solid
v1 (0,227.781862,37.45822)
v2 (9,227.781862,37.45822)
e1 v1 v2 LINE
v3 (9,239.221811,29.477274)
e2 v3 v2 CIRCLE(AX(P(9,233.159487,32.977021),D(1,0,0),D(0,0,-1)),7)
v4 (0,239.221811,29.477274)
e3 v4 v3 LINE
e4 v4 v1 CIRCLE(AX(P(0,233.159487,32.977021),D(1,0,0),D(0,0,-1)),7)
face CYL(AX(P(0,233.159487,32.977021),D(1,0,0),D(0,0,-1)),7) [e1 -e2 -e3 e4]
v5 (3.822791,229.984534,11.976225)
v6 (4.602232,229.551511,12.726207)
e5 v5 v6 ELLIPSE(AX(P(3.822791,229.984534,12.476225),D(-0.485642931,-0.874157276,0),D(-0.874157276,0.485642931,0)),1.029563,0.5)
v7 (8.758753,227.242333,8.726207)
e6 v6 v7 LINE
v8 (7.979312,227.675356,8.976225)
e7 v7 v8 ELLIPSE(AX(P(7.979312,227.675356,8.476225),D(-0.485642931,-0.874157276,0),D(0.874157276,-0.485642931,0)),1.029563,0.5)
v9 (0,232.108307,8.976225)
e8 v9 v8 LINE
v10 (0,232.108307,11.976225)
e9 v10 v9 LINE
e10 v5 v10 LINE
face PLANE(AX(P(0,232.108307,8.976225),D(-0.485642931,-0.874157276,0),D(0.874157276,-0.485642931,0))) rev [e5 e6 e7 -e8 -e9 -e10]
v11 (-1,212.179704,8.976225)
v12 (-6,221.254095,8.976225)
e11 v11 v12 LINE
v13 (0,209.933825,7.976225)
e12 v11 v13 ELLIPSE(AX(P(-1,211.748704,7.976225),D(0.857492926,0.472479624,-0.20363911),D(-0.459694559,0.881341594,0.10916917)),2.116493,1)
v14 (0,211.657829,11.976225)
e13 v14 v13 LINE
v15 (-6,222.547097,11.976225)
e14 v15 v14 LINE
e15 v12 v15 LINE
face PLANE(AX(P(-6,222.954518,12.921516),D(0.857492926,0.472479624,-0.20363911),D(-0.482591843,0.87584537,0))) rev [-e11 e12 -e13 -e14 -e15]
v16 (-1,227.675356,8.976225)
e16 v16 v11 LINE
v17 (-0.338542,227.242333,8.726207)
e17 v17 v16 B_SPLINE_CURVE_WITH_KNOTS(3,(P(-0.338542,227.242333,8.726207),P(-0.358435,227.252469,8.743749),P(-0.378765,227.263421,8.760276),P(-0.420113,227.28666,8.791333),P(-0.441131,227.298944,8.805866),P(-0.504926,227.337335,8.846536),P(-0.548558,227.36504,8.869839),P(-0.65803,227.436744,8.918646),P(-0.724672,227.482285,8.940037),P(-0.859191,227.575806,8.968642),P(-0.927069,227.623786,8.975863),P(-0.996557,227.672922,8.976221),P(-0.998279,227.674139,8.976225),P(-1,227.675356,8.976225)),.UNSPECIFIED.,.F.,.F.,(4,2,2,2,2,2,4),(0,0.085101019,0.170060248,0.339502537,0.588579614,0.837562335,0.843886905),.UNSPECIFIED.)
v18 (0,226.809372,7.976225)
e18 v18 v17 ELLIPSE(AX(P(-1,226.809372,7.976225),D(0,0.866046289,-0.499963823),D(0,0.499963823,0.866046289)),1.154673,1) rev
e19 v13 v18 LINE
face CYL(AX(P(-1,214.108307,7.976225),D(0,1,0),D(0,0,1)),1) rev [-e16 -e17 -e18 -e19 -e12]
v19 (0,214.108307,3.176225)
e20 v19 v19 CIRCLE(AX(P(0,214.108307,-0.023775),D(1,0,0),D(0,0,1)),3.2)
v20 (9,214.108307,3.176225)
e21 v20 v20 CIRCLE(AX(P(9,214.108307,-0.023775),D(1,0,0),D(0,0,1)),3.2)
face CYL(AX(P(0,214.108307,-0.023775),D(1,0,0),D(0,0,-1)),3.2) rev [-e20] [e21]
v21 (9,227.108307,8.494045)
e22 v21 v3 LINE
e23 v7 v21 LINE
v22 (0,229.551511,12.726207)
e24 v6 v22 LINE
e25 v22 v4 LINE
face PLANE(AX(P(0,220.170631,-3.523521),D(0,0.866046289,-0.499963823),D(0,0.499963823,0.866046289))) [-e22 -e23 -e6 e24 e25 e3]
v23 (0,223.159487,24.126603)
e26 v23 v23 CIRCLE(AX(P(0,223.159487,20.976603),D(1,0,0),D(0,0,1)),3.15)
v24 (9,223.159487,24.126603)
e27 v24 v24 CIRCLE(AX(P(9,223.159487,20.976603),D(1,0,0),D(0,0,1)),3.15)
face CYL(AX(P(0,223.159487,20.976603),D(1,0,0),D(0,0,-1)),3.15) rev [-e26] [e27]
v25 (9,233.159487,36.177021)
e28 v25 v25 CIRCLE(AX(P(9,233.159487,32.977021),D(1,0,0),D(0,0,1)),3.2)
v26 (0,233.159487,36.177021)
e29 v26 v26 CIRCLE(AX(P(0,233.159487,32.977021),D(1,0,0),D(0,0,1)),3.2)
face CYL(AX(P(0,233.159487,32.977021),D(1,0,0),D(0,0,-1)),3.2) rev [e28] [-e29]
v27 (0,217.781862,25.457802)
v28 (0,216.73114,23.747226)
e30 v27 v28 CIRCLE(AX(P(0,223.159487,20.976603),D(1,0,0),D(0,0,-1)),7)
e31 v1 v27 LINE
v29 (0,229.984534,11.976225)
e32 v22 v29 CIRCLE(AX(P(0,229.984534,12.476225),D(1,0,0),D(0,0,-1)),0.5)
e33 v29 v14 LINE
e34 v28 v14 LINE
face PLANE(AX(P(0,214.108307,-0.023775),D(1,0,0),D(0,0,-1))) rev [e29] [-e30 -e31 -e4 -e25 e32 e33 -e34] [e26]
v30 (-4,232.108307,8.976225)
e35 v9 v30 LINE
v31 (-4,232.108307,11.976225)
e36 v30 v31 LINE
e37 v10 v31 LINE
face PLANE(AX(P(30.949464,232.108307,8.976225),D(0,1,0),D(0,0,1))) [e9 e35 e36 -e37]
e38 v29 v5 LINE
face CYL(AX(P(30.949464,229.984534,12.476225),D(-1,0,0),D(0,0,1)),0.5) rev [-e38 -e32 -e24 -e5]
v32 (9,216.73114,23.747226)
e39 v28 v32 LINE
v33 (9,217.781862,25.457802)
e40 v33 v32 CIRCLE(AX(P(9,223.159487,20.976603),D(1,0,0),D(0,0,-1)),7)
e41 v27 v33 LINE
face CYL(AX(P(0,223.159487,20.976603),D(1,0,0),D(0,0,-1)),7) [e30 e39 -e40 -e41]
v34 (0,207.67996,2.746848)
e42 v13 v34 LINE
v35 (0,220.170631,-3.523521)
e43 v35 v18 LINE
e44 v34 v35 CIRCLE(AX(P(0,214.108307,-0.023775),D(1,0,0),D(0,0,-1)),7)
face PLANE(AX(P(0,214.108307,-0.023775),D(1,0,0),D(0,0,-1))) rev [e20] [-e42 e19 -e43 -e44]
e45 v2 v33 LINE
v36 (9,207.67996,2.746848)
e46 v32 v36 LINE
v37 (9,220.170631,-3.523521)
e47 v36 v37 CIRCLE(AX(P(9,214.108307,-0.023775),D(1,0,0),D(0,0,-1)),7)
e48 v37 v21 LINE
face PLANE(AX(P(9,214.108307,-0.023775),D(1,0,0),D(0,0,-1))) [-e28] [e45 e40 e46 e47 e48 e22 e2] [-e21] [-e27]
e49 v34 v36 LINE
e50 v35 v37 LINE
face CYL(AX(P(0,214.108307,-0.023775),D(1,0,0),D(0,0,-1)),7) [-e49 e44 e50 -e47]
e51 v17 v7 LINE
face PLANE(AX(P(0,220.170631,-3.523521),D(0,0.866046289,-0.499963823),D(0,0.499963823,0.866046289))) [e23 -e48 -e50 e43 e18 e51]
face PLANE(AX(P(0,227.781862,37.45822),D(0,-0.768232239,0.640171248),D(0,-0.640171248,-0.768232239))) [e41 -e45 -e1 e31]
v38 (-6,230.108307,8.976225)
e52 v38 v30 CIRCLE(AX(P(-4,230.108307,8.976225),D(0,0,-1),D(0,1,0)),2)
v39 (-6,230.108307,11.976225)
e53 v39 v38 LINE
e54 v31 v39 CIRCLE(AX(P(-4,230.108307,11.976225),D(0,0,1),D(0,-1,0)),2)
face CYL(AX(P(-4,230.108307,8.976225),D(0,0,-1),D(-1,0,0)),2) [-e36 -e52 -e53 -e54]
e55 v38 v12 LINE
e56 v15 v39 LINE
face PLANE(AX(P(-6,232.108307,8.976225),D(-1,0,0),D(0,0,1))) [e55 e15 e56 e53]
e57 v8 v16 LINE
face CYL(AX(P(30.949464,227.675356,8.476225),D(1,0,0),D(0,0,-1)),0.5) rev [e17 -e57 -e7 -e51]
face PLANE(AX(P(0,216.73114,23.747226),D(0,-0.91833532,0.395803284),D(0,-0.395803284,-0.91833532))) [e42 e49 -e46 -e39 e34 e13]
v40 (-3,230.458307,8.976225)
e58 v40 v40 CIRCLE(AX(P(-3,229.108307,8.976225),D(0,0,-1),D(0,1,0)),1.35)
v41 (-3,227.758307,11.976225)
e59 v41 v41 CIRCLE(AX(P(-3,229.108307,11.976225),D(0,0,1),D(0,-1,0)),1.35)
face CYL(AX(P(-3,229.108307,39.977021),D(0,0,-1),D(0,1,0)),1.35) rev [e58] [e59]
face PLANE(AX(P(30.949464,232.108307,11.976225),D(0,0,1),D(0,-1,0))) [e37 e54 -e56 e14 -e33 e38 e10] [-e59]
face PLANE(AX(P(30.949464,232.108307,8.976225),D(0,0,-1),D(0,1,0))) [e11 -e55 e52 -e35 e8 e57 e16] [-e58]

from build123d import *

# Parameters (mm, degrees)
SKETCH1_R                       = 3.20000000000001
SKETCH1_R_2                     = 3.2000000000000157
SKETCH1_R_3                     = 3.1500000000000266
BOSS_EXTRUDE1_DEPTH             = 9.000000000000002
BOSS_EXTRUDE2_DEPTH             = 6
BOSS_EXTRUDE2_DIRECTION_2_REACH = 245.63
SKETCH3_R                       = 1.3499999999999934
CUT_EXTRUDE1_DEPTH              = 243.3192700509415
CHAMFER1_SIZE                   = 6
CHAMFER1_SIZE_2                 = 10
CHAMFER2_SIZE                   = 5
CHAMFER2_SIZE_2                 = 9
FILLET1_R                       = 2
FILLET2_R                       = 0.5
FILLET3_R                       = 0.5
FILLET4_R                       = 1


with BuildPart() as part:
    # Sketch1 → Boss-Extrude1 (new body)
    with BuildSketch(Plane(origin=(9.000000000000002, 0, 0), x_dir=(0, 0, -1), z_dir=(1, 0, 0))):
        with BuildLine():
            Line((3.5235214674406836, 220.17063085897752), (-29.477274377996263, 239.2218112310119))
            ThreePointArc((-29.477274377996263, 239.2218112310119), (-38.718007493319135, 237.16461837930046), (-37.45821987569468, 227.78186152983258))
            Line((-37.45821987569468, 227.78186152983258), (-25.4578021395881, 217.78186152983255))
            ThreePointArc((-25.4578021395881, 217.78186152983255), (-24.640376533153265, 217.19486094146168), (-23.74722639538112, 216.731139964795))
            Line((-23.74722639538112, 216.731139964795), (-2.7468482860507106, 207.6799595927607))
            ThreePointArc((-2.7468482860507106, 207.6799595927607), (6.279741658038257, 210.96778498862912), (3.5235214674406836, 220.17063085897752))
        make_face()
        with Locations(Location((0.02377470320349104, 214.10830683380283, 0), (0, 0, 180))):
            Circle(SKETCH1_R, mode=Mode.SUBTRACT)
        with Locations(Location((-32.97702114223346, 233.1594872058372, 0), (0, 0, 180))):
            Circle(SKETCH1_R_2, mode=Mode.SUBTRACT)
        with Locations(Location((-20.97660340612688, 223.1594872058372, 0), (0, 0, 180))):
            Circle(SKETCH1_R_3, mode=Mode.SUBTRACT)
    extrude(amount=-BOSS_EXTRUDE1_DEPTH)

    # Sketch2 → Boss-Extrude2 (add)
    with BuildSketch(Plane.ZY):
        Polygon((8.976225296796509, 232.10830683380286), (11.976225296796507, 232.10830683380286), (11.97622529679651, 211.6578287344907), (8.976225296796512, 210.36482624783363), align=None)
    extrude(amount=BOSS_EXTRUDE2_DEPTH)

    # Boss-Extrude2 direction 2: up to this face of the body (flat: up to its plane)
    boss_extrude2_direction_2_end = Plane(part.part.faces().sort_by_distance((9, 223.146004551, 16.682900482))[0])
    # Sketch2 → Boss-Extrude2 direction 2 (add, up to the picked face)
    with BuildSketch(Plane.ZY, mode=Mode.PRIVATE) as boss_extrude2_direction_2_sk1:
        Polygon((8.976225296796509, 232.10830683380286), (11.976225296796507, 232.10830683380286), (11.97622529679651, 211.6578287344907), (8.976225296796512, 210.36482624783363), align=None)
    boss_extrude2_direction_2_tool1 = split(extrude(boss_extrude2_direction_2_sk1.sketch, amount=-BOSS_EXTRUDE2_DIRECTION_2_REACH, mode=Mode.PRIVATE), bisect_by=boss_extrude2_direction_2_end, keep=Keep.BOTH, mode=Mode.PRIVATE)
    add(boss_extrude2_direction_2_tool1.solids().sort_by(Axis((0, 221.556515, 10.460903), (1, 0, 0)))[0])

    # Sketch3 → Cut-Extrude1 (cut, through all)
    with BuildSketch(Plane(origin=(0, 1.43e-15, 8.976225296796544), x_dir=(-1, 0, 0), z_dir=(0, -1.6e-16, -1))):
        with Locations(Location((3, 229.10830683380286, 0), (0, 0, 90))):
            Circle(SKETCH3_R)
    extrude(amount=-CUT_EXTRUDE1_DEPTH, mode=Mode.SUBTRACT)

    # Chamfer1
    # the kernel refuses this chamfer: 10, 6 mm, written as the material it takes off along each edge
    with BuildSketch(Plane(origin=(-6, 221.89433509463086, 35.72677442359438), x_dir=(0.9984760801092615, -0.05067944312803606, 0.021842881995648558), z_dir=(0, -0.3958032841791771, -0.9183353201488973))) as chamfer1_piece_1:
        Polygon((CHAMFER1_SIZE * 0.998476080109, -CHAMFER1_SIZE * 0.0551862070598), (-CHAMFER1_SIZE_2 * 0.0551862070598, -CHAMFER1_SIZE_2 * 0.998476080109), (0, 0), align=None)
    extrude(amount=54.99200253498646, mode=Mode.SUBTRACT)

    # Chamfer2
    # the kernel refuses this chamfer: 9, 5 mm, written as the material it takes off along each edge
    with BuildSketch(Plane(origin=(9.000000000000002, 232.10830683380286, -14.314617746831651), x_dir=(0.060700782983652134, -0.9981560073180803, 0), z_dir=(0, 0, 1))) as chamfer2_piece_1_section:
        Polygon((CHAMFER2_SIZE * 0.998156007318, -CHAMFER2_SIZE * 0.0607007829837), (-CHAMFER2_SIZE_2 * 0.0607007829837, -CHAMFER2_SIZE_2 * 0.998156007318), (0, 0), align=None)
    chamfer2_piece_1 = extrude(amount=49.581686087256315, mode=Mode.PRIVATE)
    chamfer2_piece_1 = split(chamfer2_piece_1, bisect_by=Plane(origin=(5.860742966777749, 228.82016054729928, 11.45934877100172), z_dir=(0, 0.8660462893106784, -0.49996382346246293)), keep=Keep.TOP, mode=Mode.PRIVATE)
    add(chamfer2_piece_1, mode=Mode.SUBTRACT)

    # Fillet1
    fillet1_edges = [part.edges().sort_by_distance(p)[0] for p in [
        (-6, 232.10830683380286, 10.476225296796507),
    ]]
    fillet(fillet1_edges, radius=FILLET1_R)

    # Fillet2
    fillet2_edges = [part.edges().sort_by_distance(p)[0] for p in [
        (4.249475994772133, 227.38666683961173, 8.97622529679651),
    ]]
    fillet(fillet2_edges, radius=FILLET2_R)

    # Fillet3
    fillet3_edges = [part.edges().sort_by_distance(p)[0] for p in [
        (2.6907806455631165, 229.11855056095553, 11.976225296796507),
    ]]
    fillet(fillet3_edges, radius=FILLET3_R)

    # Fillet4
    fillet4_edges = [part.edges().sort_by_distance(p)[0] for p in [
        (0, 219.020091073198, 8.97622529679651),
    ]]
    fillet(fillet4_edges, radius=FILLET4_R)


solid = part.part
